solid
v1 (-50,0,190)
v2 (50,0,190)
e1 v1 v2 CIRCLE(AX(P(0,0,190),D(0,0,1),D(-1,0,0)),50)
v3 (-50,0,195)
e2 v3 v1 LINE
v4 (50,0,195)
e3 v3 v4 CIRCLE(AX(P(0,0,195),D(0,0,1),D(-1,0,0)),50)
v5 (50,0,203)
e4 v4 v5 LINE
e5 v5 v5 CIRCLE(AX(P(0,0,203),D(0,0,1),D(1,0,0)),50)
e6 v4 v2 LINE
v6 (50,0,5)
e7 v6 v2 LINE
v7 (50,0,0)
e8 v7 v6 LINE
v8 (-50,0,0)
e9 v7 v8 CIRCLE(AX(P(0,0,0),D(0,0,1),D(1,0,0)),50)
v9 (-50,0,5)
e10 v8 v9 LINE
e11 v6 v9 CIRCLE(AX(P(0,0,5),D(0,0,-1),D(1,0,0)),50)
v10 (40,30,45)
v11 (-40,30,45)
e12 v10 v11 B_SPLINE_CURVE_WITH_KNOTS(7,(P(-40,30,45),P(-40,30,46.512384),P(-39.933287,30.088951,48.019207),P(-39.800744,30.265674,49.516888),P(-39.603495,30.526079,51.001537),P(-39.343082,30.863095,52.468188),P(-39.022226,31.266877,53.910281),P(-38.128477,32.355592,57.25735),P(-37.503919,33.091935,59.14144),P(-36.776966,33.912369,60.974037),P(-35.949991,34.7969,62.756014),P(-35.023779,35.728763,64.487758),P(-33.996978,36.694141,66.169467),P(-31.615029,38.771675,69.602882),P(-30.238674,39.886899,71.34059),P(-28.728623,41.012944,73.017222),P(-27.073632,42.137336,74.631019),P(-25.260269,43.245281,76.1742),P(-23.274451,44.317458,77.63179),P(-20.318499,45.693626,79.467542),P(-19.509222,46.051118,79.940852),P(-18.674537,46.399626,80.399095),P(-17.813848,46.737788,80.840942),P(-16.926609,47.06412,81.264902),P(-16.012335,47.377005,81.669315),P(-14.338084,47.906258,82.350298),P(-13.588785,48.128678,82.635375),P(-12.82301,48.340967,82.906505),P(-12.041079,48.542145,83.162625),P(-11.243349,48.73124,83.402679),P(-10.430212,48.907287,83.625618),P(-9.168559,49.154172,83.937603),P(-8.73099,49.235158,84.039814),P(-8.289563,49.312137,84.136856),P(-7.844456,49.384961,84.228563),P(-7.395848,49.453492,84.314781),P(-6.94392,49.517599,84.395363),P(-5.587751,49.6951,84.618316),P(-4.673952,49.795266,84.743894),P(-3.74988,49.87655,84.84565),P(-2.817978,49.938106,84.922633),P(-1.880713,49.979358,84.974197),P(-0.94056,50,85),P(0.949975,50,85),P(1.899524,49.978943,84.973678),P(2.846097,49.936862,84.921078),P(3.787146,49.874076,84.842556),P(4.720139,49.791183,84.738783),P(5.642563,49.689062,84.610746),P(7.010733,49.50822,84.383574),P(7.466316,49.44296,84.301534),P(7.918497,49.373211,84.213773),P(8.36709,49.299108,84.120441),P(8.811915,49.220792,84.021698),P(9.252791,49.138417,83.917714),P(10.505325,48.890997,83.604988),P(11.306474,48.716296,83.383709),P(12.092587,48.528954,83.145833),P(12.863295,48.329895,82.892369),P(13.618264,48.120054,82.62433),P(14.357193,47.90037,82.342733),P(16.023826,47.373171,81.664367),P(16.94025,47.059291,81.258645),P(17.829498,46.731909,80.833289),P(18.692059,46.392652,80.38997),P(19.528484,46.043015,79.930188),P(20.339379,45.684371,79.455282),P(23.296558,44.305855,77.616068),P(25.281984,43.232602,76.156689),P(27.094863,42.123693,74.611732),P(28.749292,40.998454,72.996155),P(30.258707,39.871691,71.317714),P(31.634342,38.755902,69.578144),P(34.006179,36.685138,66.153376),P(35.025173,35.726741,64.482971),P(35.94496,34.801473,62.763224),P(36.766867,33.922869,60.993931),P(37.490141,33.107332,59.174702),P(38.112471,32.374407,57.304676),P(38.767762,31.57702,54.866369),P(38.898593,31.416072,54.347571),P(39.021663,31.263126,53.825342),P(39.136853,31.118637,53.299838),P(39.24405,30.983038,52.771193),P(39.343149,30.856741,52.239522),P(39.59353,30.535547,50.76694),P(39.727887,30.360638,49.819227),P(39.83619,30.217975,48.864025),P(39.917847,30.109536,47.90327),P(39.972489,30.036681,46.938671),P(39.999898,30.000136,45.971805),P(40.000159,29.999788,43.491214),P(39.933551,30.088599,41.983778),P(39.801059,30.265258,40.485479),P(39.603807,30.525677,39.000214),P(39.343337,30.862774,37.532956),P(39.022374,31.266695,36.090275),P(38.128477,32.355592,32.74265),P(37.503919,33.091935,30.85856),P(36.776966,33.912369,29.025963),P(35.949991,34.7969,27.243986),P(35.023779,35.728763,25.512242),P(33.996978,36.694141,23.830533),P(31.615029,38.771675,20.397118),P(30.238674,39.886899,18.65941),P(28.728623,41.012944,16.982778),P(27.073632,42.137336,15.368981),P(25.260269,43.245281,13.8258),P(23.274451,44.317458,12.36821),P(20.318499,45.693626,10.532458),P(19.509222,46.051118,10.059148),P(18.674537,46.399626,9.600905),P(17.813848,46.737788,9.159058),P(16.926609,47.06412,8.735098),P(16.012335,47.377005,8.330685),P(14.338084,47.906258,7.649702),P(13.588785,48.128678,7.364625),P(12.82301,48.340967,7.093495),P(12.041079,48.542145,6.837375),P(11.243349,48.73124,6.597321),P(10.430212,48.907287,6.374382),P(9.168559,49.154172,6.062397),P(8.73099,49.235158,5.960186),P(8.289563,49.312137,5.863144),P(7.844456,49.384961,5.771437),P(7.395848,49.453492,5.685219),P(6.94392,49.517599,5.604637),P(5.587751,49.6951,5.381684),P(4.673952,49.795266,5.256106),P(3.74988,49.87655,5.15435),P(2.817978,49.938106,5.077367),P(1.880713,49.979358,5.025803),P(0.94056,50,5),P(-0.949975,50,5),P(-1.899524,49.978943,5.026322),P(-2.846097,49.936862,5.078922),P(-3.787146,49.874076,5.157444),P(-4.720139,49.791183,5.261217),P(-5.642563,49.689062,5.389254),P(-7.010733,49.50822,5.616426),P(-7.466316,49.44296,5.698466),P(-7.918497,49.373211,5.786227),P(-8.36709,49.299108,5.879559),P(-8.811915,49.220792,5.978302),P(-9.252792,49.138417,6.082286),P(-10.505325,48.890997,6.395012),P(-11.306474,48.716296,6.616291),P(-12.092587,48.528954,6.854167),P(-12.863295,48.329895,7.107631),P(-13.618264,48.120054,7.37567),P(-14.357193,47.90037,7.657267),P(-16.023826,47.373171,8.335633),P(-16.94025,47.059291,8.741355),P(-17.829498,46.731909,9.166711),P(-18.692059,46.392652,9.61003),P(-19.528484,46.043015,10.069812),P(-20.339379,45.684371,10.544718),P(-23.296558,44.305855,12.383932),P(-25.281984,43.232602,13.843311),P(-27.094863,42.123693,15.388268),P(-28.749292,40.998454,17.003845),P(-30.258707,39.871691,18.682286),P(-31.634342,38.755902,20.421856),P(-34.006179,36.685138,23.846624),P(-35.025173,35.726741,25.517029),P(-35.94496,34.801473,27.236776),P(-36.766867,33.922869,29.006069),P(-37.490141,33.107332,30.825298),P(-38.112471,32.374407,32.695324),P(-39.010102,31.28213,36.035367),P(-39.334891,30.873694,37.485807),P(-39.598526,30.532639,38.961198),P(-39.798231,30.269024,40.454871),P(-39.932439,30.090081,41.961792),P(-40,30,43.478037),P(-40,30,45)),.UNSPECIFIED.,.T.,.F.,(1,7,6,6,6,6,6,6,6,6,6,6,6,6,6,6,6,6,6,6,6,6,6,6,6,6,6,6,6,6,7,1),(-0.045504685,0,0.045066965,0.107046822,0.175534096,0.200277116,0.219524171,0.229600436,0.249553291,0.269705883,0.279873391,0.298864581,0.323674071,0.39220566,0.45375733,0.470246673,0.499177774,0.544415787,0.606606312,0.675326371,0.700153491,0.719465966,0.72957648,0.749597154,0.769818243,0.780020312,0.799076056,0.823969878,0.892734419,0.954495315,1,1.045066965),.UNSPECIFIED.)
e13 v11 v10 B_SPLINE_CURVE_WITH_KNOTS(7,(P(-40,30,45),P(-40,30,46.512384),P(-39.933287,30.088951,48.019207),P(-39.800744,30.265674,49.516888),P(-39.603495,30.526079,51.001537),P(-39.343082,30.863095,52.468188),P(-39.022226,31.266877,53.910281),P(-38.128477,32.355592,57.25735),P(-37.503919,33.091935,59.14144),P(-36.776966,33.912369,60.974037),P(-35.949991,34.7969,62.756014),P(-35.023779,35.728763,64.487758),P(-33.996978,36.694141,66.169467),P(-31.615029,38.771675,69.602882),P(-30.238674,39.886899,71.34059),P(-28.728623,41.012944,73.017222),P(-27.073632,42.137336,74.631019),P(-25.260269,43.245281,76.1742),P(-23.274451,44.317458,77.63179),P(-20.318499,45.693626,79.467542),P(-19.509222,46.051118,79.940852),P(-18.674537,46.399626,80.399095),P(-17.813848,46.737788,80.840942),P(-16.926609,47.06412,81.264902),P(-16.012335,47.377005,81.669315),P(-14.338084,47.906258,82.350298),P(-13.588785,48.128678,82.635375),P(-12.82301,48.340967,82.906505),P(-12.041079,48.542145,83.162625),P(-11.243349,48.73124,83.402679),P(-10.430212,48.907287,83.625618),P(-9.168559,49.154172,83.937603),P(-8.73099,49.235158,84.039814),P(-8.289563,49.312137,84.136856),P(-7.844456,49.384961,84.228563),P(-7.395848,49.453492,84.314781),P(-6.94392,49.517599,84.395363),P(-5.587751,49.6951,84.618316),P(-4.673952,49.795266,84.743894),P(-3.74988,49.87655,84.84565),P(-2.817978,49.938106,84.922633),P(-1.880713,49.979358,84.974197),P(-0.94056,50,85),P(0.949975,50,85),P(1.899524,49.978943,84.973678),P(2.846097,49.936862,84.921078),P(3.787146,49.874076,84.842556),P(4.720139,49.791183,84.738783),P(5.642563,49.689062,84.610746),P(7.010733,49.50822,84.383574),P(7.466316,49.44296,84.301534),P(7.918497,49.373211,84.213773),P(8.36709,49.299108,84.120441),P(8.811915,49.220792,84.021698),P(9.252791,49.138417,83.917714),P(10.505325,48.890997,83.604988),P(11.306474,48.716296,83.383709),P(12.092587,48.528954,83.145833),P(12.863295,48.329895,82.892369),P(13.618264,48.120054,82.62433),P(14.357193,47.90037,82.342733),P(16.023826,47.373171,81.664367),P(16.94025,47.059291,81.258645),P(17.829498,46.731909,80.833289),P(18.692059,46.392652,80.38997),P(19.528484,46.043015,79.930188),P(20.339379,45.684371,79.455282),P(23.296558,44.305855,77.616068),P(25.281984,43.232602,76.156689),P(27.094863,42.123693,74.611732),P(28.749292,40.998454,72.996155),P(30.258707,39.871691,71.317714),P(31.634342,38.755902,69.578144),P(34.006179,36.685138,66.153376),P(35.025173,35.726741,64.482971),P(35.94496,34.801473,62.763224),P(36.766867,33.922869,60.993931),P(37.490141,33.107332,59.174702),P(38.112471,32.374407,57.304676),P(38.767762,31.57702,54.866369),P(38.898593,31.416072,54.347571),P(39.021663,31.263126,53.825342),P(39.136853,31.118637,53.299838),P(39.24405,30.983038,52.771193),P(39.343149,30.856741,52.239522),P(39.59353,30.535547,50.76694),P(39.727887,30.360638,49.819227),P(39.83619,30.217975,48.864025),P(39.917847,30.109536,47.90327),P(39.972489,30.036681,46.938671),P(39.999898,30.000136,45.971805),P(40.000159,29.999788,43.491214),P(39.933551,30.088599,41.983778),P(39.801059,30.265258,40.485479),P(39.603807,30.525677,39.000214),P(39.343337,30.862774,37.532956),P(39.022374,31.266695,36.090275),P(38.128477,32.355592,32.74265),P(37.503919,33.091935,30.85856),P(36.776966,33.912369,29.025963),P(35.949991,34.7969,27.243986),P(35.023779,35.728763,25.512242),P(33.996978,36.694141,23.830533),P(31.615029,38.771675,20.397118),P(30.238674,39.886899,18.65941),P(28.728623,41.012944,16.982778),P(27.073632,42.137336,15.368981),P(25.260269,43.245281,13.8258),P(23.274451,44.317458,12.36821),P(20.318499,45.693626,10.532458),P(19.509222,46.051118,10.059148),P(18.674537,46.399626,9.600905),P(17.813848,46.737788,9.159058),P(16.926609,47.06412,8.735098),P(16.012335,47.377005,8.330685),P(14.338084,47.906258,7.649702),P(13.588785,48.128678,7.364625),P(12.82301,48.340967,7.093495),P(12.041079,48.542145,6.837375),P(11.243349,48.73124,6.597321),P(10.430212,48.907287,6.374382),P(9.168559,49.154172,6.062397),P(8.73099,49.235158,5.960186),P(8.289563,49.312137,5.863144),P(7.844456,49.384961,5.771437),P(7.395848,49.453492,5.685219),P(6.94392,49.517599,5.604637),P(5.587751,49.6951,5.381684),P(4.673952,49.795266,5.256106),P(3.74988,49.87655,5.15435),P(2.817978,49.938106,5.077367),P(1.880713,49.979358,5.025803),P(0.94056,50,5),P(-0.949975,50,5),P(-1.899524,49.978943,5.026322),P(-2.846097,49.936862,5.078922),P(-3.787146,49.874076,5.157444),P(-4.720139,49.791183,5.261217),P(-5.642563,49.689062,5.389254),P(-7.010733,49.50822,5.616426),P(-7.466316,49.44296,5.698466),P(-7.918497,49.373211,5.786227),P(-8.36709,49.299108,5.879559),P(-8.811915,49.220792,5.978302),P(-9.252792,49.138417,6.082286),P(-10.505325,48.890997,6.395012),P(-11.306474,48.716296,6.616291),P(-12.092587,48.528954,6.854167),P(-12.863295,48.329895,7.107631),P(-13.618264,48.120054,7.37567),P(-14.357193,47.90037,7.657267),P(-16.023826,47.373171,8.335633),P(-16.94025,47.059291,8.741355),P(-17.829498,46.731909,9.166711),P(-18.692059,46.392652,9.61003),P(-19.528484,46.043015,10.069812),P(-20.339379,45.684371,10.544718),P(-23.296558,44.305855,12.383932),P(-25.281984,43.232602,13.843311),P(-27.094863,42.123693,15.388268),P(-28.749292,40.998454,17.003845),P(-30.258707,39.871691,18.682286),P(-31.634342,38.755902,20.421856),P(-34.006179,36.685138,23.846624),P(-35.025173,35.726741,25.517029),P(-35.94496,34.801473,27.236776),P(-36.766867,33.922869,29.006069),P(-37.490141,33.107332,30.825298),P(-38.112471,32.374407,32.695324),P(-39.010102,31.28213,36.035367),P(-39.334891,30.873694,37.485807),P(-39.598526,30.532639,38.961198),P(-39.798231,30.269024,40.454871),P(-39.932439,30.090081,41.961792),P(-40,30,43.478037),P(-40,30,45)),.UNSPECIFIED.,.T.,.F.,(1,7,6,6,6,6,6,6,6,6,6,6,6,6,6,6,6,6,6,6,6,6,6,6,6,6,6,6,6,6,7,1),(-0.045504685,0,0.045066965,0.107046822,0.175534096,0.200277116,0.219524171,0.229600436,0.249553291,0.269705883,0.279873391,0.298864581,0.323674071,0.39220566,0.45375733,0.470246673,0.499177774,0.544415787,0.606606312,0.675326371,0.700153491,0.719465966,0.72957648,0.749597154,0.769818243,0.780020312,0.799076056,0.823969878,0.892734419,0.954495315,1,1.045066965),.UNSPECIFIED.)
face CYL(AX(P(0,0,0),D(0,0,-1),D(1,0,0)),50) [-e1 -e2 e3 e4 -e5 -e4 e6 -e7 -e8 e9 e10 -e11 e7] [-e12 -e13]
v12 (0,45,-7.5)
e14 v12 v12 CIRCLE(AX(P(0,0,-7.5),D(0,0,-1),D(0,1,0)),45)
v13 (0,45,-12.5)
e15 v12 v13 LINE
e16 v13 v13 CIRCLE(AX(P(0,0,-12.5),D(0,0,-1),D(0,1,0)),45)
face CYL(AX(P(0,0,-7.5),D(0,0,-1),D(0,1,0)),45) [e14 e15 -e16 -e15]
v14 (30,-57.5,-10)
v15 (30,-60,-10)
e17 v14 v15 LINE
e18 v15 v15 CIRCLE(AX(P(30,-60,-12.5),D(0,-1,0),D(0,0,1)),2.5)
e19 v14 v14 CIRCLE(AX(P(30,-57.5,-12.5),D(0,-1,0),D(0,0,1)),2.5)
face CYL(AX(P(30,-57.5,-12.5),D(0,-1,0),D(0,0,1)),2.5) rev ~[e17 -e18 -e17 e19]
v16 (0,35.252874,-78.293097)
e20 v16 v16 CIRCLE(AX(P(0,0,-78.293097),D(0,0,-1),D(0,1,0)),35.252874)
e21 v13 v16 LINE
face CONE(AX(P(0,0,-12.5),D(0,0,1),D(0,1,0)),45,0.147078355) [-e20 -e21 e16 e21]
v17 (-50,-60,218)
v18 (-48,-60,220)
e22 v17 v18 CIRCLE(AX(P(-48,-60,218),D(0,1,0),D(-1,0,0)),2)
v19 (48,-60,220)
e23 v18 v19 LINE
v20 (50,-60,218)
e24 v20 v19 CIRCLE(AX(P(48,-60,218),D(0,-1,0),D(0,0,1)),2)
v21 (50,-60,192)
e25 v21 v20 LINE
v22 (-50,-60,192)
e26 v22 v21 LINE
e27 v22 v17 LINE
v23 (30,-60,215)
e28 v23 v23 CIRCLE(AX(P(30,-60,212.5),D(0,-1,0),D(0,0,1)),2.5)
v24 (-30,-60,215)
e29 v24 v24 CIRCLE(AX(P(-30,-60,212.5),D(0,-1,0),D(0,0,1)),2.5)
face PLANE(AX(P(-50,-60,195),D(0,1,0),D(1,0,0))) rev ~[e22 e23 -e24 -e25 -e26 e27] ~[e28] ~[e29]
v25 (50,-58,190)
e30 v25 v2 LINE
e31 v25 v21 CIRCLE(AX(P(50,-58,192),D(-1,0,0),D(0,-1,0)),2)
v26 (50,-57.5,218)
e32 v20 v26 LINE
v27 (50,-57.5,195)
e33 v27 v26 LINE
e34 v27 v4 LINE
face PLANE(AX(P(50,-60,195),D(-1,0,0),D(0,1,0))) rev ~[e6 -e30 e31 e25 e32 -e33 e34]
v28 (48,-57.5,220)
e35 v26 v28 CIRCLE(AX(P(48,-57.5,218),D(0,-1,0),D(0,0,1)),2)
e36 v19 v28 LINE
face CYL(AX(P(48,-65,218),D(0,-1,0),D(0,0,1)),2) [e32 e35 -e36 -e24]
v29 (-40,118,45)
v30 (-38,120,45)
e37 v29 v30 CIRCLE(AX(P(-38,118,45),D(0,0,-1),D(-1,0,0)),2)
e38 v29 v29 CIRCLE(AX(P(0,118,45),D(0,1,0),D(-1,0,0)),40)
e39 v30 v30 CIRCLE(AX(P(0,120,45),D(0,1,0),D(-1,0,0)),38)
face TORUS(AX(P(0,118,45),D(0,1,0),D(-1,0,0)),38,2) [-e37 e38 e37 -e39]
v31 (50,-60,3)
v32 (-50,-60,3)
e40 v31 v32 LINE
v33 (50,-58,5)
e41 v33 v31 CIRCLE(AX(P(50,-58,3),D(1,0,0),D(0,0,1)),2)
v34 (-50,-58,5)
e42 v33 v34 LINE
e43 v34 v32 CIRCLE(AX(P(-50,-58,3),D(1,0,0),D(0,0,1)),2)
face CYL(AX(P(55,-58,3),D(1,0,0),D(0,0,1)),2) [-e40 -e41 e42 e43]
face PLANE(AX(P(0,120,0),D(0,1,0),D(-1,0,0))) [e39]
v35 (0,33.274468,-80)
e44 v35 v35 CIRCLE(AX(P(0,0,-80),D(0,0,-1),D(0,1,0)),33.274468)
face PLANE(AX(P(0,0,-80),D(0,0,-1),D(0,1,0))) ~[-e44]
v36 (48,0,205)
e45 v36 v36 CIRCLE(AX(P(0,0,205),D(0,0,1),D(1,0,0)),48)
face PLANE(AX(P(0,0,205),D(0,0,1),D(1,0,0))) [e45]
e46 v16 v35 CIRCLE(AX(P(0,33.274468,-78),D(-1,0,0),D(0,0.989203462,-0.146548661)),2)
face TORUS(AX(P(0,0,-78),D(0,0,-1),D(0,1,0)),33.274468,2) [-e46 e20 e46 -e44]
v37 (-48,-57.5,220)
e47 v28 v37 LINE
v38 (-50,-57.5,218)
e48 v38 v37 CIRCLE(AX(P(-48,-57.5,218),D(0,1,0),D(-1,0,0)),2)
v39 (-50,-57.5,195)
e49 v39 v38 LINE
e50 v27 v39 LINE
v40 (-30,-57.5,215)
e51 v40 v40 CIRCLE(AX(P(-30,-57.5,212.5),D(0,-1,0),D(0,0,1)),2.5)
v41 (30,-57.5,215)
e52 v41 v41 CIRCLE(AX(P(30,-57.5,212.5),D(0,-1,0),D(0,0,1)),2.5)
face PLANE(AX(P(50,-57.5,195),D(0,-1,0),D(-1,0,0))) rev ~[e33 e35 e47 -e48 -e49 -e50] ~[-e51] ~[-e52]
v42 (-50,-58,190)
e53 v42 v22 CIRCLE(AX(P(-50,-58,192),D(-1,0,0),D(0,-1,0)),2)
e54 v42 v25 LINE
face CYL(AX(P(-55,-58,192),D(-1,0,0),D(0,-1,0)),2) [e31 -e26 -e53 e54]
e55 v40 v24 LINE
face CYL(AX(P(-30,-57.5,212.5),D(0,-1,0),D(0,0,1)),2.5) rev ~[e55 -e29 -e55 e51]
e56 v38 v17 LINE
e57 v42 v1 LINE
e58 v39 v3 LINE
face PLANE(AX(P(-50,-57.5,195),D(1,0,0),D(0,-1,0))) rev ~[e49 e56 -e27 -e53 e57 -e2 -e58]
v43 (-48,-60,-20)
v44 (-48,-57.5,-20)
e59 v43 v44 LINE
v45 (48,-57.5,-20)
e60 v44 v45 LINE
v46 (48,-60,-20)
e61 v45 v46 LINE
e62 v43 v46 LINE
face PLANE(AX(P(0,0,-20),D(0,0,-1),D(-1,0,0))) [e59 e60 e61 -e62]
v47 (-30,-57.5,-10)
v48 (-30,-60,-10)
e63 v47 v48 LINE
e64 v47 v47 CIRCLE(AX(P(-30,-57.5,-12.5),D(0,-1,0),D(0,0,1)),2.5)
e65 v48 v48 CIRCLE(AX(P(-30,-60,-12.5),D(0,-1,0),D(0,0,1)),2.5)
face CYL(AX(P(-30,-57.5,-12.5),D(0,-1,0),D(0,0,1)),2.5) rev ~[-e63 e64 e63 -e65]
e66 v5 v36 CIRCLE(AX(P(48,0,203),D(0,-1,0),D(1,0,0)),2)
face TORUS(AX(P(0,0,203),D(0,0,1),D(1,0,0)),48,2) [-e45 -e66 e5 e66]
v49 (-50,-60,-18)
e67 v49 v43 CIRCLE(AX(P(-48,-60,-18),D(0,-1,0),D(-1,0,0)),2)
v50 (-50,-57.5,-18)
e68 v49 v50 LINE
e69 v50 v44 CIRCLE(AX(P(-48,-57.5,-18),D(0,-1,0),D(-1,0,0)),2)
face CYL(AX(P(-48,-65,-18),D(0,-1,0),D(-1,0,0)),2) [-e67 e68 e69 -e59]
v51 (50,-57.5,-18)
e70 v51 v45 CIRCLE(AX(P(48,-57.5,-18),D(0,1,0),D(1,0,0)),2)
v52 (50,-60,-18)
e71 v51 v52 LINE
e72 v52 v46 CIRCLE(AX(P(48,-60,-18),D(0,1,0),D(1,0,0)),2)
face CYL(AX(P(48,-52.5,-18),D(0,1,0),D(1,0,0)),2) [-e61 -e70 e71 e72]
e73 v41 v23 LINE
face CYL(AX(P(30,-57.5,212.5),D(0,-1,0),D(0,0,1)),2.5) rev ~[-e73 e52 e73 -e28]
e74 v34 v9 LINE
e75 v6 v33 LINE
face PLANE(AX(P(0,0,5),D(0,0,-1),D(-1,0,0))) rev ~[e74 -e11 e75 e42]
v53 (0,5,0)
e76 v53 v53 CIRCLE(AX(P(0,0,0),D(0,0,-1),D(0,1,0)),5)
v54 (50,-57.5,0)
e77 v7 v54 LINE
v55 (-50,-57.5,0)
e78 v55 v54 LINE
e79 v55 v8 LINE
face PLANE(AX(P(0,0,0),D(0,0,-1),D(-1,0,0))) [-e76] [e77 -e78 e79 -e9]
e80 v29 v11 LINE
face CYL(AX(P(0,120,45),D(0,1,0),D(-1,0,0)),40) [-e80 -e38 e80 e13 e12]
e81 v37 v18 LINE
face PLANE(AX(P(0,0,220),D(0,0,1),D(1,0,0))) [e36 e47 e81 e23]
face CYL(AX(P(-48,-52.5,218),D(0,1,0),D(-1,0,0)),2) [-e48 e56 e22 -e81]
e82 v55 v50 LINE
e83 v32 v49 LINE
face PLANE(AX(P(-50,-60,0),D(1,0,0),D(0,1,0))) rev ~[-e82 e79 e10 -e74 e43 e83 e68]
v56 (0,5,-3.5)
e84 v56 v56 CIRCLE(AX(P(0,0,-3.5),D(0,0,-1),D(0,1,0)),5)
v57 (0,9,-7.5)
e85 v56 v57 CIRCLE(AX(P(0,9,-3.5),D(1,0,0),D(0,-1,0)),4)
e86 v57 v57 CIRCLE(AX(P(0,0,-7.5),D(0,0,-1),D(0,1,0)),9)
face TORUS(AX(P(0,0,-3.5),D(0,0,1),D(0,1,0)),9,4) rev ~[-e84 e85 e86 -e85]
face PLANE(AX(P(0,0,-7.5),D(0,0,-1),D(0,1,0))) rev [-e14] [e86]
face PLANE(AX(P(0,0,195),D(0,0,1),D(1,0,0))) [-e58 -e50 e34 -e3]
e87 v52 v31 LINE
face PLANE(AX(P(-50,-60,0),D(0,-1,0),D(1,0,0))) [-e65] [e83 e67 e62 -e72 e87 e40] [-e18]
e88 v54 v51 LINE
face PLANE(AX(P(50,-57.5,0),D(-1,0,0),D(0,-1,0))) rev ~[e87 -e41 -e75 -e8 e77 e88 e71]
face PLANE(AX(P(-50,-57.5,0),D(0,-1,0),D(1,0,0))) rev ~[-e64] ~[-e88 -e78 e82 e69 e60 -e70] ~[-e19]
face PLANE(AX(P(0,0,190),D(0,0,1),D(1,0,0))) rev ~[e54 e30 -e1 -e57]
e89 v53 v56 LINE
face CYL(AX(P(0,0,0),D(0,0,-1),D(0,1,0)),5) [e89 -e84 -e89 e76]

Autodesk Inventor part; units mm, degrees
ref_plane "YZ Plane" through (0, 0, 0) normal (1, 0, 0) x (0, 1, 0)
sketch "Sketch1" plane through (0, 0, 0) normal (0, 0, 1) x (1, 0, 0)
  circle A0 centre (0, 0) radius 50
  dimension "d0" = 100
extrude "Extrusion1" add sketch "Sketch1" along normal blind 205
sketch "Sketch2" plane through (0, 0, 0) normal (1, 0, 0) x (0, 1, 0)
  line L0 (-50, 0) -> (50, 0) construction
  line L1 (0, 0) -> (0, -80)
  line L2 (0, -80) -> (35, -80)
  line L3 (0, 0) -> (5, 0)
  line L4 (5, 0) -> (5, -3.5)
  line L5 (9, -7.5) -> (45, -7.5)
  line L6 (45, -7.5) -> (45, -12.5)
  line L7 (45, -12.5) -> (35, -80)
  arc A0 (5, -3.5) -> (9, -7.5) centre (9, -3.5) ccw
  point P0 (5, -7.5)
  dimension "d3" = 80
  dimension "d4" = 35
  dimension "d5" = 5
  dimension "d6" = 7.5
  dimension "d7" = 40
  dimension "d8" = 5
  dimension "d9" = 4
revolve "Revolution1" add sketch "Sketch2" angle 360 about axis through (0, 0, 0) along (0, 0, -1)
ref_plane "Work Plane1" through (0, 120, 0) normal (0, 1, 0) x (-1, 0, 0)
sketch "Sketch3" plane through (0, 120, 0) normal (0, 1, 0) x (-1, 0, 0)
  line L0 (-50, 0) -> (50, 0) construction
  circle A0 centre (0, 45) radius 40
  line L1 (-50, 0) -> (-50, 205) construction
  point P0 (0, 0)
  dimension "d19" = 80
  dimension "d20" = 45
  dimension "d21" = 50
extrude "Extrusion2" add sketch "Sketch3" against normal blind 90
ref_plane "Work Plane2" through (0, 0, 195) normal (0, 0, 1) x (1, 0, 0)
sketch "Sketch4" plane through (0, 0, 195) normal (0, 0, 1) x (1, 0, 0)
  circle A0 centre (0, -60) radius 50 construction
  circle A1 centre (0, 0) radius 45 construction
  arc A2 (-44.9972, -0.4998) -> (44.9999, 0.1033) centre (0.0033, -0.4998) ccw
  line L0 (-50, -60) -> (50, -60)
  circle A3 centre (0, 0) radius 50 construction
  line L1 (-50, -60) -> (-50, 0)
  circle A4 centre (0, 0) radius 50 construction
  line L2 (50, -60) -> (50, 0)
  arc A5 (-50, 0) -> (50, 0) centre (0, 0) ccw
  point P0 (-44.9972, -38.1998)
  point P1 (44.9999, -81.7947)
  dimension "d26" = 100
  dimension "d27" = 60
  dimension "d29" = 90
extrude "Extrusion3" add sketch "Sketch4" against normal blind 5
sketch "Sketch7" plane through (0, 0, 0) normal (0, 0, -1) x (-1, 0, 0)
  line L0 (-50, -60) -> (50, -60) construction
  line L1 (50, -60) -> (50, 0) construction
  arc A0 (-50, 0) -> (50, 0) centre (0, 0) ccw construction
  line L2 (-50, 0) -> (-50, -60) construction
  line L3 (-50, -60) -> (50, -60)
  line L4 (50, -60) -> (50, 0)
  circle A1 centre (0, 0) radius 50 construction
  line L5 (-50, -60) -> (50, -60) projected
  line L6 (-50, 0) -> (-50, -60) projected
  line L7 (-50, -60) -> (-50, 0)
  arc A2 (-50, 0) -> (50, 0) centre (0, 0) ccw
extrude "Extrusion5" add sketch "Sketch7" against normal blind 5
sketch "Sketch8" plane through (0, 0, 0) normal (0, 0, -1) x (-1, 0, 0)
  line L0 (50, -60) -> (-50, -60) projected
  line L1 (50, 0) -> (50, -60) construction
  line L2 (-50, -60) -> (50, -60)
  line L3 (50, -60) -> (50, -57.5)
  line L4 (50, -57.5) -> (-50, -57.5)
  line L5 (-50, -57.5) -> (-50, -60)
  point P0 (0, 0)
  dimension "d37" = 2.5
extrude "Extrusion6" add sketch "Sketch8" along normal blind 20
sketch "Sketch9" plane through (-50, -57.5, 0) normal (0, 1, 0) x (1, 0, 0)
  circle A0 centre (20, 12.5) radius 5 construction
  circle A1 centre (80, 12.5) radius 5 construction
  line L0 (0, 0) -> (0, 20) construction
  line L1 (100, 0) -> (0, 0) construction
  point P0 (50, 0)
  dimension "d40" = 10
  dimension "d41" = 10
  dimension "d42" = 60
  dimension "d43" = 20
  dimension "d45" = 12.5
hole "Hole1" at (-30, -57.5, -12.5) at (30, -57.5, -12.5) direction (0, -1, 0) diameter 5 end through all
sketch "Sketch10" plane through (0, 0, 195) normal (0, 0, 1) x (1, 0, 0)
  line L0 (50, 0) -> (50, -60) construction
  line L1 (-50, -60) -> (50, -60)
  line L2 (50, -60) -> (50, -57.5)
  line L3 (50, -57.5) -> (-50, -57.5)
  line L4 (-50, -57.5) -> (-50, -60)
  point P0 (0, 0)
  dimension "d53" = 2.5
extrude "Extrusion7" add sketch "Sketch10" along normal blind 25
sketch "Sketch11" plane through (-50, -57.5, 195) normal (0, 1, 0) x (1, 0, 0)
  circle A0 centre (20, -17.5) radius 5 construction
  circle A1 centre (80, -17.5) radius 5 construction
  line L0 (100, -25) -> (0, -25) construction
  line L1 (0, 0) -> (0, -25) construction
  point P0 (50, 195)
  dimension "d56" = 10
  dimension "d57" = 10
  dimension "d58" = 7.5
  dimension "d59" = 20
  dimension "d60" = 60
hole "Hole2" at (-30, -57.5, 212.5) at (30, -57.5, 212.5) direction (0, -1, 0) diameter 5 end through all
fillet "Fillet1" radius 2 9 edges at (-50, 0, 205) (-50, -58.75, 220) (50, -58.75, 220) (-50, -58.75, -20) (50, -58.75, -20) (0, -60, 5) (0, -60, 190) (0, -35, -80) (40, 120, 45)
properties part number "Compressor_PX06" material "Polyethylene, High Density"
